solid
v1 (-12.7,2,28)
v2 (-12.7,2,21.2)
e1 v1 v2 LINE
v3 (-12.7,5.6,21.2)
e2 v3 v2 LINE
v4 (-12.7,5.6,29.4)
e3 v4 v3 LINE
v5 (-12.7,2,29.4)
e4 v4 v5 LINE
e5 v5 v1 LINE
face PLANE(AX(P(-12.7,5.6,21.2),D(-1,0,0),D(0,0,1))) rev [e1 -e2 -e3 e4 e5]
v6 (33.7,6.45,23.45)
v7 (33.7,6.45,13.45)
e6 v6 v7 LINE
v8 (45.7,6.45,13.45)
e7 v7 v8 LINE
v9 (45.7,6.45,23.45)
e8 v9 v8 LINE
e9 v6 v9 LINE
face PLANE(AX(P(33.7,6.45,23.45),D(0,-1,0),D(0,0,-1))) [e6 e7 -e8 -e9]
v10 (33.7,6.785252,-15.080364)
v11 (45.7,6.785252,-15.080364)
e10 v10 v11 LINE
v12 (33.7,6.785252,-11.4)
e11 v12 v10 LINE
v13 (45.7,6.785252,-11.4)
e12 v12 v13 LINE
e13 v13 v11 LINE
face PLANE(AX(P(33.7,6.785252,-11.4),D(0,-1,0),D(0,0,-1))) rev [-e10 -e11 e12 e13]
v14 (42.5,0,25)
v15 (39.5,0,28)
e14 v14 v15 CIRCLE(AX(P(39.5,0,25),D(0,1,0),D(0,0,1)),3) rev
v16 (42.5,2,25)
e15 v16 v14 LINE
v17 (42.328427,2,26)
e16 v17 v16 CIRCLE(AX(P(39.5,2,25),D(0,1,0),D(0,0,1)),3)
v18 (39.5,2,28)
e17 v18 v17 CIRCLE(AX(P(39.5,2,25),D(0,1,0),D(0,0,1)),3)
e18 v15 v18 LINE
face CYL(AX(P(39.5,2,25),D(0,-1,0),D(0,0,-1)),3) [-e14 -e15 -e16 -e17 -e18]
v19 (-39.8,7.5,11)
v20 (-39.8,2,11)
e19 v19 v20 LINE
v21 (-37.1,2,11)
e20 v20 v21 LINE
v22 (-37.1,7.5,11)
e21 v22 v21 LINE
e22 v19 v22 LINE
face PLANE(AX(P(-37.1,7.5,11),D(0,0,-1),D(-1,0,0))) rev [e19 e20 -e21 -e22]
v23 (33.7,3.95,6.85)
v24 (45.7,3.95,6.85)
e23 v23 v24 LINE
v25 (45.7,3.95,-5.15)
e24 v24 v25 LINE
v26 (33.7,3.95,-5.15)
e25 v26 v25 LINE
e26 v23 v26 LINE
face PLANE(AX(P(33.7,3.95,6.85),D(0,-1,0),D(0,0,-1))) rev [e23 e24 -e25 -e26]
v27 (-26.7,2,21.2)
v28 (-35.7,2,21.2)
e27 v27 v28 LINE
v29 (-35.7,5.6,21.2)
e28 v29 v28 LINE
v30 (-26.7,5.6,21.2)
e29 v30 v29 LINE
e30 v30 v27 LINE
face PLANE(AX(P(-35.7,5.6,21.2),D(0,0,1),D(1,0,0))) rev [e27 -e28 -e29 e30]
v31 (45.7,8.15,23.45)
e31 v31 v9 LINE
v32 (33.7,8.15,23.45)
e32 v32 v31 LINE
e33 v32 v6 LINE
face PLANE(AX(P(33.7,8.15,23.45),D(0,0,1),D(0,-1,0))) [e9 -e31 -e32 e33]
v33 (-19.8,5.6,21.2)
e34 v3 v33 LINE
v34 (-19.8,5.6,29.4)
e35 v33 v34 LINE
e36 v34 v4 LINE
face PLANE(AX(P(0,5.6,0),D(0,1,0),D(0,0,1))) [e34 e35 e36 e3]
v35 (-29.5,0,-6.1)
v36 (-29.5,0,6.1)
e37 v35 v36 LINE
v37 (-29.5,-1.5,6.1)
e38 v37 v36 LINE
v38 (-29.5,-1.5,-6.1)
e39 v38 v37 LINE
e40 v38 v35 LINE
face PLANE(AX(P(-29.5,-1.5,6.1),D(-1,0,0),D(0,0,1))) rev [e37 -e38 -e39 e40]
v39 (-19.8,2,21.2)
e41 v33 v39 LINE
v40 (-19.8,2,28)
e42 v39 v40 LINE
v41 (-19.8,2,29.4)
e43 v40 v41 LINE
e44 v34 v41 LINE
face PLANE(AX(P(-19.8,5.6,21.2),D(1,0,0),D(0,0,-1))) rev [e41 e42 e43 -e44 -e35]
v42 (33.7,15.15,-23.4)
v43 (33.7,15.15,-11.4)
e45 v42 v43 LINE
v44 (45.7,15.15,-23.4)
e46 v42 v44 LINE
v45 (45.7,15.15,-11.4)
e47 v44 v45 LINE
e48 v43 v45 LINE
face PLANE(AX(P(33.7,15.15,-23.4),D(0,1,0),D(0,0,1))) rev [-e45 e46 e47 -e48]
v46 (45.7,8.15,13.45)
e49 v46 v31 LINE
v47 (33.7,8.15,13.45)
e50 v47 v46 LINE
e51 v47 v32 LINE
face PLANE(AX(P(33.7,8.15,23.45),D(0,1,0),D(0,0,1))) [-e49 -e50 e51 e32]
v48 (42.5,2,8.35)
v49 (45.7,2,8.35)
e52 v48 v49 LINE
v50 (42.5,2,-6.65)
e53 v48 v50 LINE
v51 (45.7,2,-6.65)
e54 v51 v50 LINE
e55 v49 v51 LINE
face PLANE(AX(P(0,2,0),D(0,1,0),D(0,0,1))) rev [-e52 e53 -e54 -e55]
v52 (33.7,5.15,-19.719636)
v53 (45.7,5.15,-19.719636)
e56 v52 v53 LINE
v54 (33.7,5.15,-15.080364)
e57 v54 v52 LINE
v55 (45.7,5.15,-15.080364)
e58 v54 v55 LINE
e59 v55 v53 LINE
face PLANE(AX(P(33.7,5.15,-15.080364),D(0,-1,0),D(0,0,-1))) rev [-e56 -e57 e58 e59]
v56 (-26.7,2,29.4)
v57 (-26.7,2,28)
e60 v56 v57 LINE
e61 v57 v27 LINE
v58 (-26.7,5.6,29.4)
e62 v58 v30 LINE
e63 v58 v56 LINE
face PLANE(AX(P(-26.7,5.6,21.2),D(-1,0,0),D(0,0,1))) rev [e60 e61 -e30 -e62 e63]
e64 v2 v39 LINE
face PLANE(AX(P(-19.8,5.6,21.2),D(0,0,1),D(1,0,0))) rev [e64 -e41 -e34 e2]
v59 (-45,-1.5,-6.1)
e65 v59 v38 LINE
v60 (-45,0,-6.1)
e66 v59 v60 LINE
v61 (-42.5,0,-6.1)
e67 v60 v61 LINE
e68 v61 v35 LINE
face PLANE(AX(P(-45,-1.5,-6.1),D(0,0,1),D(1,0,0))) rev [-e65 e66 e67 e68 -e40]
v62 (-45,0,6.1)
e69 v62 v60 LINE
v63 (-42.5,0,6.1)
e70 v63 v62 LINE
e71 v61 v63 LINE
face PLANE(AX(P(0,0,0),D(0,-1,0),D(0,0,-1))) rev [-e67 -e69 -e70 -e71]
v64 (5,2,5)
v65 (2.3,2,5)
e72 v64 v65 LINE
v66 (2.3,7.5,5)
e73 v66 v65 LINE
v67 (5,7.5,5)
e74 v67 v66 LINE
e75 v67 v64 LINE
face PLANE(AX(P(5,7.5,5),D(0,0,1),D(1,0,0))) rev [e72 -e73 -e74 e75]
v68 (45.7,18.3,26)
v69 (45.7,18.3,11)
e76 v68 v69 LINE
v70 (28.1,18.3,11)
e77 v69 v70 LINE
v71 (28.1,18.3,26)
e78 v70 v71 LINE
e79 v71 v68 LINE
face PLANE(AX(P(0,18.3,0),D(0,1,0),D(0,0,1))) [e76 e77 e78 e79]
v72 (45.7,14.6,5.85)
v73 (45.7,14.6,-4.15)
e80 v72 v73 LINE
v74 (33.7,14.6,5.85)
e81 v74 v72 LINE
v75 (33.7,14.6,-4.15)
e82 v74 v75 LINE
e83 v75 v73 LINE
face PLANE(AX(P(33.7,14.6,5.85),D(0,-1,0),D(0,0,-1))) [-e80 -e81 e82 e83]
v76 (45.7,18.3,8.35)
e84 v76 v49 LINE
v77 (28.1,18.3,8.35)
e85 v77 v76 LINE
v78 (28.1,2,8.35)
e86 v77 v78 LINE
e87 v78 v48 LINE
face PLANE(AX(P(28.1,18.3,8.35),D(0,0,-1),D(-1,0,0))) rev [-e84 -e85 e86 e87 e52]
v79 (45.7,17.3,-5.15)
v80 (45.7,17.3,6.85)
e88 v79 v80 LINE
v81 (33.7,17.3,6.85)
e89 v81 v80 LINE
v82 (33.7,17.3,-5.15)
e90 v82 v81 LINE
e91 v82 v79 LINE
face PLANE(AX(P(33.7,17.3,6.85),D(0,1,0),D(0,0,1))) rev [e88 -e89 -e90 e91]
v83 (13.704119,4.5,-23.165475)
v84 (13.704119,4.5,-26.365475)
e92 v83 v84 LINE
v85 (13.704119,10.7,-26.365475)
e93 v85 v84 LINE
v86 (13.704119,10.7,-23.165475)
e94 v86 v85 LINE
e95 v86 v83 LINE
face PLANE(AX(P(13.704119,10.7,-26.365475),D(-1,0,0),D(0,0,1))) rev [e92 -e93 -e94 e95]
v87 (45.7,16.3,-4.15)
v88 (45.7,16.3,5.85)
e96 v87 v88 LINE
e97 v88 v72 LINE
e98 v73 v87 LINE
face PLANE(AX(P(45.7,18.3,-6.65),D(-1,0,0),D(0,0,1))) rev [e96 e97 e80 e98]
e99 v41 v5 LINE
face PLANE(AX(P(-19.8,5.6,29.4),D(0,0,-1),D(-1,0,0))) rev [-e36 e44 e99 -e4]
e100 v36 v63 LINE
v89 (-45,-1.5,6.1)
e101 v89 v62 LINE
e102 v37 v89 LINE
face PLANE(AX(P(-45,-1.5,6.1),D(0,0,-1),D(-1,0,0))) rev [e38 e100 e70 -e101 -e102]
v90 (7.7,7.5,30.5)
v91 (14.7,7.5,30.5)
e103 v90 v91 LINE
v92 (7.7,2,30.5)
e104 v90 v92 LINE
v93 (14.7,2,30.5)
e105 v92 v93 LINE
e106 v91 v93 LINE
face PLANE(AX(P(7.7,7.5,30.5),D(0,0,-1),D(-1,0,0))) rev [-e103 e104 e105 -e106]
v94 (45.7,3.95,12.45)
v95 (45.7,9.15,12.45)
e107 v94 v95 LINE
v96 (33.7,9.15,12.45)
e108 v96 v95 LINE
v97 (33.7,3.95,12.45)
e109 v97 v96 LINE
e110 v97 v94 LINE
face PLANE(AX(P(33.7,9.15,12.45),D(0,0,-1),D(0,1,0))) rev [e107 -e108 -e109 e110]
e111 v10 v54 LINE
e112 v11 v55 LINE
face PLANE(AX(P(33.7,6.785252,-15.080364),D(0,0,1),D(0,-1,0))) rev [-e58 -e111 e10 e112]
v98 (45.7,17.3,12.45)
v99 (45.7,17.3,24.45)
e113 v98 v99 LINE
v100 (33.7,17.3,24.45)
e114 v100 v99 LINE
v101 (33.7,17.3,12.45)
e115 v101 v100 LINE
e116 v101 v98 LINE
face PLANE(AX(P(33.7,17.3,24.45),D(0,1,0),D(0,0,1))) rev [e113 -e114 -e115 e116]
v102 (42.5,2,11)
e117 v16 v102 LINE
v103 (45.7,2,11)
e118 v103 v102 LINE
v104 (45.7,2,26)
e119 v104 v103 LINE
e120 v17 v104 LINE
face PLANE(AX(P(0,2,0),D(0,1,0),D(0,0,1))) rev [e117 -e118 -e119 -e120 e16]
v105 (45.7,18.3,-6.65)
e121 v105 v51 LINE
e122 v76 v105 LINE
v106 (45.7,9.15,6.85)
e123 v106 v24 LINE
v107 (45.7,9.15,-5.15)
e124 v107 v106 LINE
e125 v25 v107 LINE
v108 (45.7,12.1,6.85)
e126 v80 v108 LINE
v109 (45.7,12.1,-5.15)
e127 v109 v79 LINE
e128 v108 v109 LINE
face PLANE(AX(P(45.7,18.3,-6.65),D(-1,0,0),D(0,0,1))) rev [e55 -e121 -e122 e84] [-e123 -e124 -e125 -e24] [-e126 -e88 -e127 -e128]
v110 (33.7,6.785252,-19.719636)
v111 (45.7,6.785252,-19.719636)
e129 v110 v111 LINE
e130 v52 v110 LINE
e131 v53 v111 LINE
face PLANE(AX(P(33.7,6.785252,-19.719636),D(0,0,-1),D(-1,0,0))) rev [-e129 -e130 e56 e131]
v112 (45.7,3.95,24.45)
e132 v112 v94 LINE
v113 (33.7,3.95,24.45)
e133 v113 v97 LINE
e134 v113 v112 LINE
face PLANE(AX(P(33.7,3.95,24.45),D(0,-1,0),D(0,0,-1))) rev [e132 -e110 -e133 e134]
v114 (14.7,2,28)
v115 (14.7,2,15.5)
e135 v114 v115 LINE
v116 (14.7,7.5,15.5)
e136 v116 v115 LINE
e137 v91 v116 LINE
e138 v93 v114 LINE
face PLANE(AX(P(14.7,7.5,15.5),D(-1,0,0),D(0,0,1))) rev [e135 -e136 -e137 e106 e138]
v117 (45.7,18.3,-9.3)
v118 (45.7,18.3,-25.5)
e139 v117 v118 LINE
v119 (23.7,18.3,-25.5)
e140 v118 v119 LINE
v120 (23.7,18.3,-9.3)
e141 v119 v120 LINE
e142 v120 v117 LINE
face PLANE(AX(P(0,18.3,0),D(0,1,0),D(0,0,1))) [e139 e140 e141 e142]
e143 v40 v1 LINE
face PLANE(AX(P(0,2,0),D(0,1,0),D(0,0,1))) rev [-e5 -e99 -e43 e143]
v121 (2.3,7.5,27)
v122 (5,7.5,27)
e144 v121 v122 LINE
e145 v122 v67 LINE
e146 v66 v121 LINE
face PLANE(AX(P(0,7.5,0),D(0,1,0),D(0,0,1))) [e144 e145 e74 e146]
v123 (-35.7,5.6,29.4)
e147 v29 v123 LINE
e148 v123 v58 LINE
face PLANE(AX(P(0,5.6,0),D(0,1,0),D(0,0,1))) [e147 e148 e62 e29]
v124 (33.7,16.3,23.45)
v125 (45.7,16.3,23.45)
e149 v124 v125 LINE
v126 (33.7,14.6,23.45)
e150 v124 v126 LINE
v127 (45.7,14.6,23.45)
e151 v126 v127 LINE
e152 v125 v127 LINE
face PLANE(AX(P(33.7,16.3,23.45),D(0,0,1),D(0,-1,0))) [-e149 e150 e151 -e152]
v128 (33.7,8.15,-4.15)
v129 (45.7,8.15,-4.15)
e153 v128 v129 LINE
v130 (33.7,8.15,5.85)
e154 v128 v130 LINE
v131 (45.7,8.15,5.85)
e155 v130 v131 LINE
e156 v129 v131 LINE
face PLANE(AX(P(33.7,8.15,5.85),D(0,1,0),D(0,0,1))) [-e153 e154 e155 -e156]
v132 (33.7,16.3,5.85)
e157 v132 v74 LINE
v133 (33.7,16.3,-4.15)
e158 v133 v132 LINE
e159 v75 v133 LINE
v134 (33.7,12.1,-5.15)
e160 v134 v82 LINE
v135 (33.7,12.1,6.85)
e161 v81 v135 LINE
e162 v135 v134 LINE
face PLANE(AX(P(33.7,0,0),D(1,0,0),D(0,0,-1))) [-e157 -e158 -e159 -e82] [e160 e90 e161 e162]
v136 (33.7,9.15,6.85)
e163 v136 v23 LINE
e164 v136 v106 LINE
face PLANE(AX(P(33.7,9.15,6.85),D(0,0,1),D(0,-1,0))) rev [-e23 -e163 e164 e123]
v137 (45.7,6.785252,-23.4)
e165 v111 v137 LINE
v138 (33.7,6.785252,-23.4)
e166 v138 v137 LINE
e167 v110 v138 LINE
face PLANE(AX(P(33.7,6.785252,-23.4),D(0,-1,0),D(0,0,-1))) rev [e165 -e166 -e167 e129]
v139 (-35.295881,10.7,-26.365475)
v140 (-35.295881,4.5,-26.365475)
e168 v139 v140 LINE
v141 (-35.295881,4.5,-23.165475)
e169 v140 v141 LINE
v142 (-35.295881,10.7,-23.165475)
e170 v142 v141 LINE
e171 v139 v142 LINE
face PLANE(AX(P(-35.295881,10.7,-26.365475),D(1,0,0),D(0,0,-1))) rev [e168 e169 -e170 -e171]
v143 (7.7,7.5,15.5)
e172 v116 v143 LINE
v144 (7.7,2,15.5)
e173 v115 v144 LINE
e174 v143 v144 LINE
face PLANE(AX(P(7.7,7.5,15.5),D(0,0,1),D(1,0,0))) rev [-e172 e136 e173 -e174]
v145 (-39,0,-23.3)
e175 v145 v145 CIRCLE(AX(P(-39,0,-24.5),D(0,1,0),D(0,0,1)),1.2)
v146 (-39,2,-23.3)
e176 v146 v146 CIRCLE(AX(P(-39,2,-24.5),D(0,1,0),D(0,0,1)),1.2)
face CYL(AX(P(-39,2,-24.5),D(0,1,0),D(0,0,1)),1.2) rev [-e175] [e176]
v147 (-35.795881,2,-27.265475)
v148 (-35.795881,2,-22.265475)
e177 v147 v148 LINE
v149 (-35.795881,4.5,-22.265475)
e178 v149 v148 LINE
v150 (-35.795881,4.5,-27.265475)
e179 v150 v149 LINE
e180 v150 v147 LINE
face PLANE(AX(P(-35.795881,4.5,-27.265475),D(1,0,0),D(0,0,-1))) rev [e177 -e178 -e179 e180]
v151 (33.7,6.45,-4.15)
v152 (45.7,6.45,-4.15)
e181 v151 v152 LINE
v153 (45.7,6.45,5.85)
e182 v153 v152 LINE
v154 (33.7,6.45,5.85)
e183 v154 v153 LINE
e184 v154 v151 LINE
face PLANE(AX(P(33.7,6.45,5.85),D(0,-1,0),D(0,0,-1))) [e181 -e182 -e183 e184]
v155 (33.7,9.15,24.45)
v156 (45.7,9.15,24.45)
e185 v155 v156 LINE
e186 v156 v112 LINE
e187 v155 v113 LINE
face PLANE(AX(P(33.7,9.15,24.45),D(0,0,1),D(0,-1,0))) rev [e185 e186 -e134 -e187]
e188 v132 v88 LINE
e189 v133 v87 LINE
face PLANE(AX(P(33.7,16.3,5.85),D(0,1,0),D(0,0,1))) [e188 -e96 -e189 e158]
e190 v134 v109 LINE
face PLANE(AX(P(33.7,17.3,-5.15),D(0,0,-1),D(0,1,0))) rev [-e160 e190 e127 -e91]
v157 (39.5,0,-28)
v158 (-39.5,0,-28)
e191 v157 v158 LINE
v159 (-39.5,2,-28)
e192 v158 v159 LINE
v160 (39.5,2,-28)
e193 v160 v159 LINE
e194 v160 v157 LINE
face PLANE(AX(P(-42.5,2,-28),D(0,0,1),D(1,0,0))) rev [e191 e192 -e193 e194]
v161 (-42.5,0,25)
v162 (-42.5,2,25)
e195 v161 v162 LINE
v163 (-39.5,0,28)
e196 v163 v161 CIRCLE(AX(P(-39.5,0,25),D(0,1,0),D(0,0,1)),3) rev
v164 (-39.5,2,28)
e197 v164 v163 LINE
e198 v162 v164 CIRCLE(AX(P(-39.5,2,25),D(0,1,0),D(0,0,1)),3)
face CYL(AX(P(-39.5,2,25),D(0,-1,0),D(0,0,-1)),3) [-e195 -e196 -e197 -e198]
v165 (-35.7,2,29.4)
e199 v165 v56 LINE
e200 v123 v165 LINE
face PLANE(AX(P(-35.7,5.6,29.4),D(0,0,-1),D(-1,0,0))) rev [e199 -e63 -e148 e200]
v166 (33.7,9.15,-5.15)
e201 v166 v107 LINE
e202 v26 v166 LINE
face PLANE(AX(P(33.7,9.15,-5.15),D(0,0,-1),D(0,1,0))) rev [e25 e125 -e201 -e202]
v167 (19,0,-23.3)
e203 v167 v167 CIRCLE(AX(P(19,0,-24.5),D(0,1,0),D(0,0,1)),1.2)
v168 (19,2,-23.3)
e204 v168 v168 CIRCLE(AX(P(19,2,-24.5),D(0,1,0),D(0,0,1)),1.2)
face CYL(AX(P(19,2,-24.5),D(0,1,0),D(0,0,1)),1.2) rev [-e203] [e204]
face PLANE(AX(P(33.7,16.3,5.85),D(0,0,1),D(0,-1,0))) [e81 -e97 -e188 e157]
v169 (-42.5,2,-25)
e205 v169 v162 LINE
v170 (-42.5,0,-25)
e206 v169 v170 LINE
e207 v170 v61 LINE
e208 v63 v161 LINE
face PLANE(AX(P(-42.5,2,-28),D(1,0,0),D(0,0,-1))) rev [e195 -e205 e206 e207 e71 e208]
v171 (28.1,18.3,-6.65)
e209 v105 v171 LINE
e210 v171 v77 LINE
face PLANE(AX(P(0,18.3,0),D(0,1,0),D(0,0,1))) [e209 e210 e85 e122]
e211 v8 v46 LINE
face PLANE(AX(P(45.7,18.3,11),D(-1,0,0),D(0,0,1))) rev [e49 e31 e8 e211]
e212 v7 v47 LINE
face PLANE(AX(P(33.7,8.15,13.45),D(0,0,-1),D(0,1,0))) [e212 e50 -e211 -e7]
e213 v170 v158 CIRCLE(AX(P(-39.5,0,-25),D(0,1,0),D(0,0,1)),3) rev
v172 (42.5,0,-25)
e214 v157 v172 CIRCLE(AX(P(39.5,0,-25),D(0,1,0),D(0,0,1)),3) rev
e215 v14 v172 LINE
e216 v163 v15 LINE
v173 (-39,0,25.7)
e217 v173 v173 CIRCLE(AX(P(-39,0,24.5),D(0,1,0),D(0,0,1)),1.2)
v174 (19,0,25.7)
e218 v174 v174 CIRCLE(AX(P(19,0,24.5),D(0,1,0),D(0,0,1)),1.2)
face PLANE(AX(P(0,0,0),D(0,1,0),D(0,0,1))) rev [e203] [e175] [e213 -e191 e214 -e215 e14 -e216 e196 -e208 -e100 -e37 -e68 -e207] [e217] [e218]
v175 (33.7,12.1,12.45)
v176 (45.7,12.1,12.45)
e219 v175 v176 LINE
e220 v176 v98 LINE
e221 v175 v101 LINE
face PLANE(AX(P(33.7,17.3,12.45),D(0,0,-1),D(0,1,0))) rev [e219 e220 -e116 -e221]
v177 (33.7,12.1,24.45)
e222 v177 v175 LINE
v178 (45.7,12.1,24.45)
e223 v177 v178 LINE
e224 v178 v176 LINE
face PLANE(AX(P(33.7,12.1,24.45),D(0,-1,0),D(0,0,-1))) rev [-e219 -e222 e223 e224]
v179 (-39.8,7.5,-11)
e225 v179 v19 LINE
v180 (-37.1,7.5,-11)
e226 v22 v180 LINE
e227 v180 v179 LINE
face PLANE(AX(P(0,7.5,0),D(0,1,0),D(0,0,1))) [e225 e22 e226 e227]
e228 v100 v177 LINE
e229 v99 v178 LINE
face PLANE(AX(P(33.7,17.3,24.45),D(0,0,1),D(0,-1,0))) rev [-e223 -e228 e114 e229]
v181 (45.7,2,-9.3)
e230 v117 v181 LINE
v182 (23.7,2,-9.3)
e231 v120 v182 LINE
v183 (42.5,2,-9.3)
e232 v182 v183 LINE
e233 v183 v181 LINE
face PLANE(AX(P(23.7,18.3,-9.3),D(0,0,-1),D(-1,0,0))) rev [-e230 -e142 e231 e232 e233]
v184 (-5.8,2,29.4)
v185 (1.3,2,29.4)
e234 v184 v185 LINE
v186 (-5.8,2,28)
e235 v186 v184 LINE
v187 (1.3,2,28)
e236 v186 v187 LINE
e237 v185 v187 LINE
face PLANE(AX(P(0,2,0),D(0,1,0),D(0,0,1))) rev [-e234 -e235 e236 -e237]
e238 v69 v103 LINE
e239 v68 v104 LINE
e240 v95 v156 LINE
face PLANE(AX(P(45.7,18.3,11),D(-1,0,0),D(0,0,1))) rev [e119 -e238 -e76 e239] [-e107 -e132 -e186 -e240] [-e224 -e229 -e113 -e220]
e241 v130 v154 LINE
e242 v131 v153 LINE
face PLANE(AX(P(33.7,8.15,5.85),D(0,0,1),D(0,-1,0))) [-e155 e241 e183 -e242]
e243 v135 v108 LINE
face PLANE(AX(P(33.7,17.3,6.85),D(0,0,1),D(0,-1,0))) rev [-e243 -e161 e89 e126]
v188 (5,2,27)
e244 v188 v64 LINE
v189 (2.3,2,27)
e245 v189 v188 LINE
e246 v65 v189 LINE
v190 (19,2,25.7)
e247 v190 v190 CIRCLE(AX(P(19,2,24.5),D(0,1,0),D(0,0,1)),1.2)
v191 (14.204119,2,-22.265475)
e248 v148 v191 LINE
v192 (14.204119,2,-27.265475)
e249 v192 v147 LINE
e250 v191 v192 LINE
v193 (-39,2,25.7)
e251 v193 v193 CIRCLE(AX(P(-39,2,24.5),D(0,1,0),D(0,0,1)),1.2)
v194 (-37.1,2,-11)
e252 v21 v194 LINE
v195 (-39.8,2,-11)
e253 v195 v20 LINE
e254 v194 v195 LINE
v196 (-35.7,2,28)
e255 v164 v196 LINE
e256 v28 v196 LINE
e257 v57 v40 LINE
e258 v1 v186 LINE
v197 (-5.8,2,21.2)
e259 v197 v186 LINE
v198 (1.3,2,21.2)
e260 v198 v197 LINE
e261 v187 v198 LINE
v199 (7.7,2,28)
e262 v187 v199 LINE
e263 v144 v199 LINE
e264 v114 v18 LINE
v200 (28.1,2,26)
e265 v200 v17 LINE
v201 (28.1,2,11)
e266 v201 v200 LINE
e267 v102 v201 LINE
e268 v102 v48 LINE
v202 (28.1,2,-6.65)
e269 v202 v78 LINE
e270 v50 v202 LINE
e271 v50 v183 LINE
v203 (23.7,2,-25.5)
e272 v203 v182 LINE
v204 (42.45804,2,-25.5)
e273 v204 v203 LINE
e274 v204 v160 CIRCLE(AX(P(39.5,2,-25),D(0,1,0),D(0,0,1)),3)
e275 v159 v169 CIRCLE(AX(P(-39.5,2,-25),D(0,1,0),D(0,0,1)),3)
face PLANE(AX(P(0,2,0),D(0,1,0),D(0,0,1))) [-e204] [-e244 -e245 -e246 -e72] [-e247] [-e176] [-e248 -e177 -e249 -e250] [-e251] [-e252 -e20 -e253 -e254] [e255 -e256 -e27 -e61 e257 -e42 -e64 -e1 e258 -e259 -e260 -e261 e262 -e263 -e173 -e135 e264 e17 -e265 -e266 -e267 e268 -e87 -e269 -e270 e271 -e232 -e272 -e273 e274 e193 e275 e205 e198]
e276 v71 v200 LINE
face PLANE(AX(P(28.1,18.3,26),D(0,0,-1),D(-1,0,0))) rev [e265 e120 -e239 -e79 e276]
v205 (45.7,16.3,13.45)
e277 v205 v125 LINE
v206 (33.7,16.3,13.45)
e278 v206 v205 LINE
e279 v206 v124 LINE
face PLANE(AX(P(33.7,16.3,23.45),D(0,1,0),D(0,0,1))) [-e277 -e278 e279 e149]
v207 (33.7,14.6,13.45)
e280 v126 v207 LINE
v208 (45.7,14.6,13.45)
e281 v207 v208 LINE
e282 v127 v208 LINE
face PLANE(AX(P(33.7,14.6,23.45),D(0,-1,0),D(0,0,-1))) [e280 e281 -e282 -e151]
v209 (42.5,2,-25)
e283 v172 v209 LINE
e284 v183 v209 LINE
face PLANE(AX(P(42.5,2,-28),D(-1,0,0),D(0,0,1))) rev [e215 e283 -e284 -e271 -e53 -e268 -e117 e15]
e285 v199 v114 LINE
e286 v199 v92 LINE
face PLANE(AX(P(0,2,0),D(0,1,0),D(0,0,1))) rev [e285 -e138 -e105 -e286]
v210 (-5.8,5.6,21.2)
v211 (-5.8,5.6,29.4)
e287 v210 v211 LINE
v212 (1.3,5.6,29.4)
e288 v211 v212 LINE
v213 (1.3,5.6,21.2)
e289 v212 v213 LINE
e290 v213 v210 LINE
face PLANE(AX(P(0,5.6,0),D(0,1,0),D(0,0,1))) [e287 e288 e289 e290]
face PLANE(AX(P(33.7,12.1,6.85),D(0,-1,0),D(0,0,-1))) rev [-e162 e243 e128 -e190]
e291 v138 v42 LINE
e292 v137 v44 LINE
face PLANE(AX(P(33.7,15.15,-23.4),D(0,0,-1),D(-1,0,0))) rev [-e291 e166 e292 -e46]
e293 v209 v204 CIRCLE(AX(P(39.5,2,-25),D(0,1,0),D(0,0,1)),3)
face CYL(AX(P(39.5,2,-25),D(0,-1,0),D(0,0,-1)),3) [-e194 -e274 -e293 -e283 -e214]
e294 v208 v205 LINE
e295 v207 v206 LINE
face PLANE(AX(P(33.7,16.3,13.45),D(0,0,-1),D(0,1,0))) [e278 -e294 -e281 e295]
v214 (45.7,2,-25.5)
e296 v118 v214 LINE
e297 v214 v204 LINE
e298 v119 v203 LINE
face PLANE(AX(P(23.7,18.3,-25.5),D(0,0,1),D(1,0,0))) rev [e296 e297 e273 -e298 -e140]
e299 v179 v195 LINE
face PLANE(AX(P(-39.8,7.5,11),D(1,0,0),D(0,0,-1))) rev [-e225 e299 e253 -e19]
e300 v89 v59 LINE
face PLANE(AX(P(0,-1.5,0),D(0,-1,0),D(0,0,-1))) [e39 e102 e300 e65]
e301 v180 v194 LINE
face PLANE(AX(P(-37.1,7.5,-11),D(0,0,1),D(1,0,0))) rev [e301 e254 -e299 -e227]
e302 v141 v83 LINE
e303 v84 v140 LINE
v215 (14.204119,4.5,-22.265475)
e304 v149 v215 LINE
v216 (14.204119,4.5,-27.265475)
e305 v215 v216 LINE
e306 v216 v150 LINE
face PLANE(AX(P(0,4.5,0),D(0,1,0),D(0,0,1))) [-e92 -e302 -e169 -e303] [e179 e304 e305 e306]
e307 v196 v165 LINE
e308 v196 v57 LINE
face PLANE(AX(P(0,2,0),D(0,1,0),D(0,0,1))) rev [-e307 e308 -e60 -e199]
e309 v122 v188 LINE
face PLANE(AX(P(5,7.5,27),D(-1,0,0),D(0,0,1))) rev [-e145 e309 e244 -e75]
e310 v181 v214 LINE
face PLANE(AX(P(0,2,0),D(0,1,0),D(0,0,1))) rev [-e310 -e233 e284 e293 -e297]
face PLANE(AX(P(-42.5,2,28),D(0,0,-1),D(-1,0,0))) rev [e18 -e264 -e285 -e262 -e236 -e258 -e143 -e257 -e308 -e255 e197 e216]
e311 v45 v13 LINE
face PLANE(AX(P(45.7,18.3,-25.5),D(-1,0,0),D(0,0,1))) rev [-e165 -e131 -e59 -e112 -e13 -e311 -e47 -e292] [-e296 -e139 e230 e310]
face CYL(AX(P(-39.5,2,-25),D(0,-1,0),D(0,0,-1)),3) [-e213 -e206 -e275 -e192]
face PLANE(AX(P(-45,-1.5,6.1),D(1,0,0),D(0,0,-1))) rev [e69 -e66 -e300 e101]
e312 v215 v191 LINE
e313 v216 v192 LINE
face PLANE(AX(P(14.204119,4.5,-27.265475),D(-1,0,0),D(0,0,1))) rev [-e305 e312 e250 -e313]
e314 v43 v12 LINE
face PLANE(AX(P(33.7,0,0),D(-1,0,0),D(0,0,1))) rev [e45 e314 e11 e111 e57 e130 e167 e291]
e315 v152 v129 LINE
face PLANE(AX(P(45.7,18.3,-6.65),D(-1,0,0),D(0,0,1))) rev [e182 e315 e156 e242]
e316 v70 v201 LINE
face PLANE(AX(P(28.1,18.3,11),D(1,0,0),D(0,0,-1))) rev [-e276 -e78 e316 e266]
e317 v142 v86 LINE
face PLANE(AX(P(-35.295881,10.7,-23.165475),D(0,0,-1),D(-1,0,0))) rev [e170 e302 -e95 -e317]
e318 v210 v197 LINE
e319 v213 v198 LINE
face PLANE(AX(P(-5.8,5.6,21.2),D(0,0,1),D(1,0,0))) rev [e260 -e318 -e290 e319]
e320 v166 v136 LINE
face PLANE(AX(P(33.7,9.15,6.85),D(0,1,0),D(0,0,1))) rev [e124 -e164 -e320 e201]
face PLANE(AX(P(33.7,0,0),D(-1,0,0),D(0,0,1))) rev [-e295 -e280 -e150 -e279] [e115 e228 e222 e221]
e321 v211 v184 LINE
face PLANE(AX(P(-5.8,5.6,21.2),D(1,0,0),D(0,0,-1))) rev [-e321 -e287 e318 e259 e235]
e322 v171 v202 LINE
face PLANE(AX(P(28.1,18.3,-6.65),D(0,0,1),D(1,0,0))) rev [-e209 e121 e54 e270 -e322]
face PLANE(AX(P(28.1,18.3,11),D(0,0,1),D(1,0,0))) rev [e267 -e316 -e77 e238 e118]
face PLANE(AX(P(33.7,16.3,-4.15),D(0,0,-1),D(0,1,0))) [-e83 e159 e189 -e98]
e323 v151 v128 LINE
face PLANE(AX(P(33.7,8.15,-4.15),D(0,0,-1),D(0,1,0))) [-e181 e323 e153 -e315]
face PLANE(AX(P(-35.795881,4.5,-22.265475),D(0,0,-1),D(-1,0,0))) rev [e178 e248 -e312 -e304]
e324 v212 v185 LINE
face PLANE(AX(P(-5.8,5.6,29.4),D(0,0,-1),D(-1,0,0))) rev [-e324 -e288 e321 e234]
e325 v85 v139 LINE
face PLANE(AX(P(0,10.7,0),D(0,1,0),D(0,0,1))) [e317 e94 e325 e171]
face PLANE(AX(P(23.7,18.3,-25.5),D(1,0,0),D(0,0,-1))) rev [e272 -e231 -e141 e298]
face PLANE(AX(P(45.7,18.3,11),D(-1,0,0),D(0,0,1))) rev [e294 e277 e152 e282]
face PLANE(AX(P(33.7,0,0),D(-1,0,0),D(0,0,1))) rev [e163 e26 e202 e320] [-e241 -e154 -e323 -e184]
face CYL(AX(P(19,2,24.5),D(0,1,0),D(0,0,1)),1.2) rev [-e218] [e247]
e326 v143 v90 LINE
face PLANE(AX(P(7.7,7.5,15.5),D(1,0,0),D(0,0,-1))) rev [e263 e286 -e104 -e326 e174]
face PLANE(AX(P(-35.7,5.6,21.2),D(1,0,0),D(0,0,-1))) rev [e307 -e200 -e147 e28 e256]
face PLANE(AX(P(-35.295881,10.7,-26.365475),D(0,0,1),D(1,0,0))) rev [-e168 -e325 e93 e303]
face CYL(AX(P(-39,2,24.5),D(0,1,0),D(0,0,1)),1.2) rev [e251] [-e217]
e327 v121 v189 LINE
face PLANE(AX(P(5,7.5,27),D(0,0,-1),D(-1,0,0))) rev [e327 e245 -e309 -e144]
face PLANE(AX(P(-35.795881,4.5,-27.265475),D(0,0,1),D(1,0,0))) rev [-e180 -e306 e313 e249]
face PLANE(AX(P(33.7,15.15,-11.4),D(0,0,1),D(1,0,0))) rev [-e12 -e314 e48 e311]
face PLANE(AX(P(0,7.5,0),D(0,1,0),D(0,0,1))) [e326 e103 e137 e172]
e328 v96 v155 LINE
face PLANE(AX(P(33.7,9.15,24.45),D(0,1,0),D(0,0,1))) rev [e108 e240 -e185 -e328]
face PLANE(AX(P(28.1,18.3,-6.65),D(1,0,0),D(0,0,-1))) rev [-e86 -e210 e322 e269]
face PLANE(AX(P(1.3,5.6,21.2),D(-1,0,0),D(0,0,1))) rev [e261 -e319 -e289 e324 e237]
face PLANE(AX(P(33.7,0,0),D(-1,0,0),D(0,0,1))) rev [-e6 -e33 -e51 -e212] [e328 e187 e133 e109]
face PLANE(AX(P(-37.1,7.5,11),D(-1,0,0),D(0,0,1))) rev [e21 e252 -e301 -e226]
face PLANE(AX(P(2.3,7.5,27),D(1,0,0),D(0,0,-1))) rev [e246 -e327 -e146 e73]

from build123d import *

# Parameters (mm, degrees)
ESQUISSE1_W             = 85
ESQUISSE1_H             = 56
BOSS_EXTRU_1_DEPTH      = 2
D_GAGEMENT_M21_D        = 2.4
ESQUISSE4_W             = 50
ESQUISSE4_H             = 5
BOSS_EXTRU_3_DEPTH      = 2.5
ESQUISSE6_W             = 49
ESQUISSE6_H             = 3.2
BOSS_EXTRU_5_DEPTH      = 6.2
ESQUISSE3_W             = 22
ESQUISSE3_H             = 16.2
ESQUISSE3_W_2           = 17.6
ESQUISSE3_H_2           = 15
BOSS_EXTRU_2_DEPTH      = 16.3
ESQUISSE7_W             = 12
ESQUISSE7_H             = 5.2
ESQUISSE7_W_2           = 10
ESQUISSE7_H_2           = 1.7
ENL_V_MAT_EXTRU_1_DEPTH = 12
ESQUISSE5_W             = 9
ESQUISSE5_H             = 8.2
ESQUISSE5_W_2           = 7.1
BOSS_EXTRU_4_DEPTH      = 3.6
ESQUISSE8_W             = 7
ESQUISSE8_H             = 15
ESQUISSE8_W_2           = 2.7
ESQUISSE8_H_2           = 22
BOSS_EXTRU_6_DEPTH      = 5.5
ESQUISSE9_W             = 15.5
ESQUISSE9_H             = 12.2
BOSS_EXTRU_7_DEPTH      = 1.5
CONG_1_R                = 3


with BuildPart() as part:
    # Esquisse1 → Boss.-Extru.1 (new body)
    with BuildSketch(Plane(origin=(0, 0, 0), x_dir=(1, 0, 0), z_dir=(0, 1, 0))):
        Rectangle(ESQUISSE1_W, ESQUISSE1_H)
    extrude(amount=BOSS_EXTRU_1_DEPTH)

    # Dégagement M21 (through all)
    with Locations(Plane(origin=(-39, 2, -24.5), x_dir=(0, 0, 1), z_dir=(0, 1, 0))):
        with Locations((0, 0), (49, 0), (0, 58), (49, 58)):
            Hole(D_GAGEMENT_M21_D / 2)

    # Esquisse4 → Boss.-Extru.3 (add)
    with BuildSketch(Plane(origin=(0, 2, 0), x_dir=(1, 0, 0), z_dir=(0, 1, 0))):
        with Locations((-10.795881497, 24.765474627)):
            Rectangle(ESQUISSE4_W, ESQUISSE4_H)
    extrude(amount=BOSS_EXTRU_3_DEPTH)

    # Esquisse6 → Boss.-Extru.5 (add)
    with BuildSketch(Plane(origin=(0, 4.5, 0), x_dir=(1, 0, 0), z_dir=(0, 1, 0))):
        with Locations((-10.795881497, 24.765474627)):
            Rectangle(ESQUISSE6_W, ESQUISSE6_H)
    extrude(amount=BOSS_EXTRU_5_DEPTH)

    # Esquisse3 → Boss.-Extru.2 (add)
    with BuildSketch(Plane(origin=(0, 2, 0), x_dir=(1, 0, 0), z_dir=(0, 1, 0))):
        with Locations((34.7, 17.4)):
            Rectangle(ESQUISSE3_W, ESQUISSE3_H)
        with Locations((36.9, -18.5)):
            Rectangle(ESQUISSE3_W_2, ESQUISSE3_H_2)
        with Locations((36.9, -0.85)):
            Rectangle(ESQUISSE3_W_2, ESQUISSE3_H_2)
    extrude(amount=BOSS_EXTRU_2_DEPTH)

    # Esquisse7 → Enlèv. mat.-Extru.1 (cut)
    # profile 1 of 5: a face of its own
    with BuildSketch(Plane(origin=(45.7, 0, 0), x_dir=(0, 0, -1), z_dir=(1, 0, 0))):
        Polygon((23.4, 15.15), (11.4, 15.15), (11.4, 6.785251797), (15.080363944, 6.785251797), (15.080363944, 5.15), (19.719636056, 5.15), (19.719636056, 6.785251797), (23.4, 6.785251797), align=None)
    # profile 2 of 5: a face of its own
    with BuildSketch(Plane(origin=(45.7, 0, 0), x_dir=(0, 0, -1), z_dir=(1, 0, 0))):
        with Locations((-18.45, 14.7)):
            Rectangle(ESQUISSE7_W, ESQUISSE7_H)
        with Locations((-18.45, 15.45)):
            Rectangle(ESQUISSE7_W_2, ESQUISSE7_H_2, mode=Mode.SUBTRACT)
    # profile 3 of 5: a face of its own
    with BuildSketch(Plane(origin=(45.7, 0, 0), x_dir=(0, 0, -1), z_dir=(1, 0, 0))):
        with Locations((-0.85, 14.7)):
            Rectangle(ESQUISSE7_W, ESQUISSE7_H)
        with Locations((-0.85, 15.45)):
            Rectangle(ESQUISSE7_W_2, ESQUISSE7_H_2, mode=Mode.SUBTRACT)
    # profile 4 of 5: a face of its own
    with BuildSketch(Plane(origin=(45.7, 0, 0), x_dir=(0, 0, -1), z_dir=(1, 0, 0))):
        with Locations((-18.45, 6.55)):
            Rectangle(ESQUISSE7_W, ESQUISSE7_H)
        with Locations((-18.45, 7.3)):
            Rectangle(ESQUISSE7_W_2, ESQUISSE7_H_2, mode=Mode.SUBTRACT)
    # profile 5 of 5: a face of its own
    with BuildSketch(Plane(origin=(45.7, 0, 0), x_dir=(0, 0, -1), z_dir=(1, 0, 0))):
        with Locations((-0.85, 6.55)):
            Rectangle(ESQUISSE7_W, ESQUISSE7_H)
        with Locations((-0.85, 7.3)):
            Rectangle(ESQUISSE7_W_2, ESQUISSE7_H_2, mode=Mode.SUBTRACT)
    extrude(amount=-ENL_V_MAT_EXTRU_1_DEPTH, mode=Mode.SUBTRACT)

    # Esquisse5 → Boss.-Extru.4 (add)
    with BuildSketch(Plane(origin=(0, 2, 0), x_dir=(1, 0, 0), z_dir=(0, 1, 0))):
        with Locations((-31.2, -25.3)):
            Rectangle(ESQUISSE5_W, ESQUISSE5_H)
        with Locations((-16.25, -25.3)):
            Rectangle(ESQUISSE5_W_2, ESQUISSE5_H)
        with Locations((-2.25, -25.3)):
            Rectangle(ESQUISSE5_W_2, ESQUISSE5_H)
    extrude(amount=BOSS_EXTRU_4_DEPTH)

    # Esquisse8 → Boss.-Extru.6 (add)
    with BuildSketch(Plane(origin=(0, 2, 0), x_dir=(1, 0, 0), z_dir=(0, 1, 0))):
        with Locations((11.2, -23)):
            Rectangle(ESQUISSE8_W, ESQUISSE8_H)
        with Locations((3.65, -16)):
            Rectangle(ESQUISSE8_W_2, ESQUISSE8_H_2)
        with Locations((-38.45, 0)):
            Rectangle(ESQUISSE8_W_2, ESQUISSE8_H_2)
    extrude(amount=BOSS_EXTRU_6_DEPTH)

    # Esquisse9 → Boss.-Extru.7 (add)
    with BuildSketch(Plane.XZ):
        with Locations((-37.25, 0)):
            Rectangle(ESQUISSE9_W, ESQUISSE9_H)
    extrude(amount=BOSS_EXTRU_7_DEPTH)

    # Congé1
    # the kernel refuses this fillet: 3 mm, written as the material it takes off along each edge
    with BuildSketch(Plane(origin=(42.5, -7.5, 28), x_dir=(0, 0, -1), z_dir=(0, 1, 0)), Plane(origin=(42.5, -7.5, -28), x_dir=(-1, 0, 0), z_dir=(0, 1, 0))) as cong_1_piece_1:
        with BuildLine():
            CenterArc((CONG_1_R, CONG_1_R), CONG_1_R, 180, 90)
            Line((0, CONG_1_R), (0, 0))
            Line((0, 0), (CONG_1_R, 0))
        make_face()
    extrude(amount=9.5, mode=Mode.SUBTRACT)
    with BuildSketch(Plane(origin=(-42.5, -7.5, 28), x_dir=(0, 0, -1), z_dir=(0, 1, 0)), Plane(origin=(-42.5, -7.5, -28), x_dir=(1, 0, 0), z_dir=(0, 1, 0))) as cong_1_piece_2:
        with BuildLine():
            CenterArc((CONG_1_R, -CONG_1_R), CONG_1_R, 90, 90)
            Line((0, -CONG_1_R), (0, 0))
            Line((0, 0), (CONG_1_R, 0))
        make_face()
    extrude(amount=17, mode=Mode.SUBTRACT)


solid = part.part
